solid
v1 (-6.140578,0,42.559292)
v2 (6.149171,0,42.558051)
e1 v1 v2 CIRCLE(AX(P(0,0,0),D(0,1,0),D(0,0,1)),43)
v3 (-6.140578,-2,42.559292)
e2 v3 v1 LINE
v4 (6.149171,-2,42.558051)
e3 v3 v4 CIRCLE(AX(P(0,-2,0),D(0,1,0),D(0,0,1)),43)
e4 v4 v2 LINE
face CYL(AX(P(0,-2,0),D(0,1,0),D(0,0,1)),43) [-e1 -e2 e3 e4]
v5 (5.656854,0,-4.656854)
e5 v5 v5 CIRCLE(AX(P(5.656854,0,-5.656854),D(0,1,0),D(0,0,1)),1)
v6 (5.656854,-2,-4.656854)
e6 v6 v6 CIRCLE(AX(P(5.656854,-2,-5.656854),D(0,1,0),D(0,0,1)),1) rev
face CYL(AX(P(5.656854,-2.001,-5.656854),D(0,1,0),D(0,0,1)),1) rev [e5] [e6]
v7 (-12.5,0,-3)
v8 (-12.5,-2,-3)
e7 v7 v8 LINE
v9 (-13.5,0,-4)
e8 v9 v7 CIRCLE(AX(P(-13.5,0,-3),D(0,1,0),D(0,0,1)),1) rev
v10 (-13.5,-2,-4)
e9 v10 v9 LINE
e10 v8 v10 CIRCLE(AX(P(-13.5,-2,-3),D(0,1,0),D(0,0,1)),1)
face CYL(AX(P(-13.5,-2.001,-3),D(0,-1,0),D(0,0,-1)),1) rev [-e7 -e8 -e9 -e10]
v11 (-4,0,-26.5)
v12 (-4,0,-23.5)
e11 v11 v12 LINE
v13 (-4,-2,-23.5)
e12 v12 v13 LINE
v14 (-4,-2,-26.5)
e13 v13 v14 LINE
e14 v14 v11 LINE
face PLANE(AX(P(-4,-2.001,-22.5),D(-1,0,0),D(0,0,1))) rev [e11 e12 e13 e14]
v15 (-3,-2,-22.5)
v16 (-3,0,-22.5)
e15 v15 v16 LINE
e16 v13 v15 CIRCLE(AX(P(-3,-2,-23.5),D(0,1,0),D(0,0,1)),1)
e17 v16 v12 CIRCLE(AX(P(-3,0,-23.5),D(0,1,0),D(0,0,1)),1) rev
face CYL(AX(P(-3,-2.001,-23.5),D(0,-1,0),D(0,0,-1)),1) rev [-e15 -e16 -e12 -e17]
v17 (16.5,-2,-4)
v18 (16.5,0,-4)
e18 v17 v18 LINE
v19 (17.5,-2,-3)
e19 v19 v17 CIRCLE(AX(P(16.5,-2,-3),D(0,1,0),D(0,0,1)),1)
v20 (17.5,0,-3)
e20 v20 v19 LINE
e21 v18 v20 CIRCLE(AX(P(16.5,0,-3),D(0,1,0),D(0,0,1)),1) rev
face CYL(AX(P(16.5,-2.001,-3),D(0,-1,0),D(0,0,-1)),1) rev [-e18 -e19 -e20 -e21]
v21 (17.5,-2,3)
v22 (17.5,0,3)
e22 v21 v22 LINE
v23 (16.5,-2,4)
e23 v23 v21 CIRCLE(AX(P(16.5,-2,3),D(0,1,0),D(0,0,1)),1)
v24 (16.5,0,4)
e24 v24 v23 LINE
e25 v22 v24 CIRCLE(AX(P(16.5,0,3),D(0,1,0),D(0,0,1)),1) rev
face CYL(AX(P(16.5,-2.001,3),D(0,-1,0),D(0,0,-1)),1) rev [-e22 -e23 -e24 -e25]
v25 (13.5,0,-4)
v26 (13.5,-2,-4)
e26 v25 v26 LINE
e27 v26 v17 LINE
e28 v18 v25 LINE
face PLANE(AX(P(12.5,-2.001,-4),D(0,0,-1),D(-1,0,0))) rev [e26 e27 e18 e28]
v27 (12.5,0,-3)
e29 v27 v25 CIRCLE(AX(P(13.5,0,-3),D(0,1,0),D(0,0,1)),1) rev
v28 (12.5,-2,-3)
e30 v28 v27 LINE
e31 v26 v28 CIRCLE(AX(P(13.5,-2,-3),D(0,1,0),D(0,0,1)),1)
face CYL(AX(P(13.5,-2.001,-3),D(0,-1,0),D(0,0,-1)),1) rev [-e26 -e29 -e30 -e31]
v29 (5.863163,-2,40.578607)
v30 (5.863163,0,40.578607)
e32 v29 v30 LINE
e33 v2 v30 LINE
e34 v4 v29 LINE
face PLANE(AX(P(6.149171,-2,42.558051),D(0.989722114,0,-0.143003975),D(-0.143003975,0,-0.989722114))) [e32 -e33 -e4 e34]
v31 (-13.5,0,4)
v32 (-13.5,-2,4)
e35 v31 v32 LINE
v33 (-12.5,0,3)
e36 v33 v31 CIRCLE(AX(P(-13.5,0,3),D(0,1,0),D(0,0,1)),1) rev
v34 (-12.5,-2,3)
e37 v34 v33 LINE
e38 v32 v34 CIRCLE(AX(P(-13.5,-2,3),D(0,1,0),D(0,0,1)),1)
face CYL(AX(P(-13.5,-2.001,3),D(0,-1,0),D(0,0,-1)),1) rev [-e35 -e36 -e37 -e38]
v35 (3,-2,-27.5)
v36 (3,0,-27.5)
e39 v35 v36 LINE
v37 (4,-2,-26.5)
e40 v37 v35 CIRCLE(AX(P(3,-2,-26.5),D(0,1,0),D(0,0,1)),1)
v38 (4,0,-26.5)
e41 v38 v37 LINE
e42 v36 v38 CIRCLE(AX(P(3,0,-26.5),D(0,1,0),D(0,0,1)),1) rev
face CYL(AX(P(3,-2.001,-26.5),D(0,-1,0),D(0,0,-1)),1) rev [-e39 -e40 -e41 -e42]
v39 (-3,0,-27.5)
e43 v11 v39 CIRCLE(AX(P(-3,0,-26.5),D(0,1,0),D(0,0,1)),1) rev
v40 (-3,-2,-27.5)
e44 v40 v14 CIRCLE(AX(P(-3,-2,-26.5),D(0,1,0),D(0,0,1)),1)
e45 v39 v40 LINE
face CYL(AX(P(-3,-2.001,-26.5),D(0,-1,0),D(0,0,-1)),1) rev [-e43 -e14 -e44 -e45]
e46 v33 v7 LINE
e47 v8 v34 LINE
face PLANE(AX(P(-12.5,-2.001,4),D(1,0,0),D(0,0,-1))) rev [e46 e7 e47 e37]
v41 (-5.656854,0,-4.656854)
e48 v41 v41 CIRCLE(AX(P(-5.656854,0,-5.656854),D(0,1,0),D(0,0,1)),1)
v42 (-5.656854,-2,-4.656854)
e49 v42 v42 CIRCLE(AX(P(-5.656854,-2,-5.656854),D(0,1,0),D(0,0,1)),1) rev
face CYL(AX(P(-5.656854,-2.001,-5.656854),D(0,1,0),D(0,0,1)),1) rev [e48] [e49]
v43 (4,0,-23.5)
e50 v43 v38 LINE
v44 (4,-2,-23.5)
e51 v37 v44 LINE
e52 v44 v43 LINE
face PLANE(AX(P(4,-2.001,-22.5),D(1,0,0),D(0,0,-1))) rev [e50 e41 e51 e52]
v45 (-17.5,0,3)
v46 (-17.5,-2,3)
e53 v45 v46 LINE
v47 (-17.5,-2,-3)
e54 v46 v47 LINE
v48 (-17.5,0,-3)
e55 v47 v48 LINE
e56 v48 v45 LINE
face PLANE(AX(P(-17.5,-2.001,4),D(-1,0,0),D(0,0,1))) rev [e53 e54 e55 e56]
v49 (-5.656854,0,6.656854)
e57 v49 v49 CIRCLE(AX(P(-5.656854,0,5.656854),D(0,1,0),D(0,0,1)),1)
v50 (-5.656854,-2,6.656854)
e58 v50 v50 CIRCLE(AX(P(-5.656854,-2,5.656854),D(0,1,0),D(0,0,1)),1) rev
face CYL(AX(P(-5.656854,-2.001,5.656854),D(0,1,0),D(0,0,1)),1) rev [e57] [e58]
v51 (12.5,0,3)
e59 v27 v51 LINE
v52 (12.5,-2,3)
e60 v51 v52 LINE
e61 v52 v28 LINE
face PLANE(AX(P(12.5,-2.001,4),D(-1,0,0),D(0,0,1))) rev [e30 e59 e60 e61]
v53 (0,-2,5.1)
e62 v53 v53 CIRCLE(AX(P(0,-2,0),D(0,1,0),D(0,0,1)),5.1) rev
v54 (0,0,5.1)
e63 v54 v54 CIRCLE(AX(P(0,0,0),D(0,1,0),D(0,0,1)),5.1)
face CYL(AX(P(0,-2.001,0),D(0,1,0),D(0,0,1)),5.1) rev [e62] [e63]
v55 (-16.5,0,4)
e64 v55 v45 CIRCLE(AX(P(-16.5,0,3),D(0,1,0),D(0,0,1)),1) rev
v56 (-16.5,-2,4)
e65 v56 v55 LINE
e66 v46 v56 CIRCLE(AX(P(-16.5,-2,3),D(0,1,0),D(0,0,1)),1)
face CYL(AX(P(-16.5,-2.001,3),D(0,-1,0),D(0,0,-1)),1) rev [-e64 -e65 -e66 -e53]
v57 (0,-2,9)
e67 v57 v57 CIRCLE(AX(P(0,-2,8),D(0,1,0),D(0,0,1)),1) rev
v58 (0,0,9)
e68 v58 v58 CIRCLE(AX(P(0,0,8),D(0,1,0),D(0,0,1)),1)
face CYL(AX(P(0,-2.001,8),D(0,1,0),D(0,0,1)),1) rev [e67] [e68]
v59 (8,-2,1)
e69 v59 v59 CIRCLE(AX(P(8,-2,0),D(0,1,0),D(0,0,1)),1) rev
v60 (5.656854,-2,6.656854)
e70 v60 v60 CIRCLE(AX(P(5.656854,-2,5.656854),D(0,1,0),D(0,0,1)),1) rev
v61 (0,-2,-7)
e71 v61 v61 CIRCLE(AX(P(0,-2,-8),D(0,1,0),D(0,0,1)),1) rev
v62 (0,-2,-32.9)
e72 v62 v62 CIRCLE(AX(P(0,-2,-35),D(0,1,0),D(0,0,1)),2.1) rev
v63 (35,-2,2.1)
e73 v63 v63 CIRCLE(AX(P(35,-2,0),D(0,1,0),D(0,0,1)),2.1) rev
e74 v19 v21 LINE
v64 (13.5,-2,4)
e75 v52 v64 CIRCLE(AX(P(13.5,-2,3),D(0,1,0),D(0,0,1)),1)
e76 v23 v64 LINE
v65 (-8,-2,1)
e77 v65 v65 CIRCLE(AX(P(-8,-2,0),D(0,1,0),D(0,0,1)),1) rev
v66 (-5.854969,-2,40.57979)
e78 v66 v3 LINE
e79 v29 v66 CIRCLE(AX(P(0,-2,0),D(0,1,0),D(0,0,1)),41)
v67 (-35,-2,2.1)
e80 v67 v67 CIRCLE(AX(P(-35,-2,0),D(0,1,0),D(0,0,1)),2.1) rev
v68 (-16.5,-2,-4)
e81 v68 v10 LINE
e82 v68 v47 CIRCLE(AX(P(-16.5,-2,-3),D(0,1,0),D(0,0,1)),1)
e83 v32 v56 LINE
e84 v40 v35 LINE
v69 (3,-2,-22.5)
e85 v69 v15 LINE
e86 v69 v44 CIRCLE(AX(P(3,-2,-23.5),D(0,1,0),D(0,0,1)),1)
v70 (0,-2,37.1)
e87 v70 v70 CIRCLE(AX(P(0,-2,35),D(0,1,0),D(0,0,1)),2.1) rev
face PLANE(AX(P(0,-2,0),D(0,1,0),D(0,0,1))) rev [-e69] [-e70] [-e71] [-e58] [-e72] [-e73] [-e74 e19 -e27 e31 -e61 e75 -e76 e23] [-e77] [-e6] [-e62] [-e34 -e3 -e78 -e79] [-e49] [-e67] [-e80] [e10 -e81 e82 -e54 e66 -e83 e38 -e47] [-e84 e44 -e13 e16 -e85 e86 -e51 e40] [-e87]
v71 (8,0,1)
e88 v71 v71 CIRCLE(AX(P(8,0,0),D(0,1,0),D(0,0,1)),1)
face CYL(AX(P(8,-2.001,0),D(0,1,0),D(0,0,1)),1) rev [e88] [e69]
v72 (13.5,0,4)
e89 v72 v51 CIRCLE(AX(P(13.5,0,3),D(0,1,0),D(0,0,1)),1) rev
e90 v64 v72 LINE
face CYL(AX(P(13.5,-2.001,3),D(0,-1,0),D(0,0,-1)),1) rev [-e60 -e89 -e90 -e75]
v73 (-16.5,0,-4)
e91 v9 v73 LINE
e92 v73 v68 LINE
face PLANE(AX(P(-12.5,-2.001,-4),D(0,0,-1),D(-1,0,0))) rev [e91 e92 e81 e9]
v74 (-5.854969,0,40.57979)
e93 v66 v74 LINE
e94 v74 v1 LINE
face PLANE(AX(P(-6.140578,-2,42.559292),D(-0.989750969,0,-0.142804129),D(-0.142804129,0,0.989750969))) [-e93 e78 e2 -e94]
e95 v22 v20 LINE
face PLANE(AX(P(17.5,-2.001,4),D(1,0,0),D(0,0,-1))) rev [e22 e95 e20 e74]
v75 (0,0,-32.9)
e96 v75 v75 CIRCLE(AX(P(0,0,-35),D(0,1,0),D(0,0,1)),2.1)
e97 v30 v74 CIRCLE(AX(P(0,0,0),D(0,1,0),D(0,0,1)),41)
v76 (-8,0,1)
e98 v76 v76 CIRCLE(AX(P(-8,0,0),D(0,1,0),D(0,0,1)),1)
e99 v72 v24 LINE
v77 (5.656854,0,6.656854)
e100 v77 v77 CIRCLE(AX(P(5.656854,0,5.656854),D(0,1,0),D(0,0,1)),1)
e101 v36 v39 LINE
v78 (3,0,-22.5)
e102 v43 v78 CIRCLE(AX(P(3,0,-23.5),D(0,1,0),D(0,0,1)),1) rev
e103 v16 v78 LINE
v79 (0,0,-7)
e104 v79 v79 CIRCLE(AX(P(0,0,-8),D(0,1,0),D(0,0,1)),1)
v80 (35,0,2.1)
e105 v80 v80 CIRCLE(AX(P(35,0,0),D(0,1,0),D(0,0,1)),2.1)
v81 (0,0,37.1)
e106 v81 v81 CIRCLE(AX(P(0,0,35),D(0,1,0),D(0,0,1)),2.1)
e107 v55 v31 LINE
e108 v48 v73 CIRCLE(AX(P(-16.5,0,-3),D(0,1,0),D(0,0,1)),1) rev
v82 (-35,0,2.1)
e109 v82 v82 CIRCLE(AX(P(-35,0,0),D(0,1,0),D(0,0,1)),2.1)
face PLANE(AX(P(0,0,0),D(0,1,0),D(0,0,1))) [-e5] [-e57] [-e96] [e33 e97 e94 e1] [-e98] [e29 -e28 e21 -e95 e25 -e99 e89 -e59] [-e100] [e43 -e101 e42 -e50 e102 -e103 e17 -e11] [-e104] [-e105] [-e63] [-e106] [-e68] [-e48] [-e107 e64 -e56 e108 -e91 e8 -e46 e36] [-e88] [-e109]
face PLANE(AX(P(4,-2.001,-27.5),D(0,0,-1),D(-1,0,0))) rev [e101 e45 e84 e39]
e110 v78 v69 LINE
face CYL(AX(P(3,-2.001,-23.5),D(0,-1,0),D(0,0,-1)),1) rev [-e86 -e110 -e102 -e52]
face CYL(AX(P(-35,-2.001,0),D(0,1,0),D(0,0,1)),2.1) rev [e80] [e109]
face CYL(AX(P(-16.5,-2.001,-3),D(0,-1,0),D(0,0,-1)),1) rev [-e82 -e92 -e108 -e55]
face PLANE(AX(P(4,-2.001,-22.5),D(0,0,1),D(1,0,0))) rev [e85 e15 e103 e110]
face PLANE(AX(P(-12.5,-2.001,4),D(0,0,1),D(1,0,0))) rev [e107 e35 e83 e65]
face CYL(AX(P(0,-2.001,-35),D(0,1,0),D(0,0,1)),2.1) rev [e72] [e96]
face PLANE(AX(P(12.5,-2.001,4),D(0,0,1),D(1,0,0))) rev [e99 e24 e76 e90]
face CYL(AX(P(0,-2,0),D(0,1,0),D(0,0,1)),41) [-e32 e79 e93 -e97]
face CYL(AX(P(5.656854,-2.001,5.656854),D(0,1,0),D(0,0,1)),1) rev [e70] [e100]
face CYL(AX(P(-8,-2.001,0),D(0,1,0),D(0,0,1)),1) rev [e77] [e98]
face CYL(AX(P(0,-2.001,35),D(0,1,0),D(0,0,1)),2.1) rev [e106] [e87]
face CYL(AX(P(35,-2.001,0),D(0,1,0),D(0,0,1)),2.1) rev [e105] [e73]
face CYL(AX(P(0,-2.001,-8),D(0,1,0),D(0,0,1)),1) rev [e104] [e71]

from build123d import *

# Parameters (mm, degrees)
SM_BASE_FLANGE_1_DEPTH = 2
CUT_EXTRUDE_1_REACH    = 61.447
SKETCH_6_R             = 2.1
SKETCH_6_R_2           = 5.1
SKETCH_6_R_3           = 1
SKETCH_6_W             = 8
SKETCH_6_H             = 5
SKETCH_6_W_2           = 5
SKETCH_6_H_2           = 8
FILLET_1_R             = 1


# Sheet-metal steps are written as plain solids
with BuildPart() as part:
    # Sketch 1 → 基体-法兰1 (new body)
    with BuildSketch(Plane(origin=(0, 0, 0), x_dir=(1, 0, 0), z_dir=(0, 1, 0))):
        with BuildLine():
            Line((-6.14057756, -42.559291667), (-5.854969301, -40.579789729))
            ThreePointArc((-5.854969301, -40.579789729), (-0.00413932, 40.999999791), (5.863162974, -40.578606678))
            Line((5.863162974, -40.578606678), (6.149170924, -42.558050906))
            ThreePointArc((6.149170924, -42.558050906), (0.004341238, -42.999999781), (-6.14057756, -42.559291667))
        make_face()
    extrude(amount=-SM_BASE_FLANGE_1_DEPTH)

    # 草图6 → 切除-拉伸1 (cut, up to next)
    with BuildSketch(Plane(origin=(0, 0, 0), x_dir=(1, 0, 0), z_dir=(0, 1, 0)), mode=Mode.PRIVATE) as cut_extrude_1_sk1:
        with Locations(Location((0, 35, 0), (0, 0, 270))):
            Circle(SKETCH_6_R)
    cut_extrude_1_tool1 = extrude(cut_extrude_1_sk1.sketch, amount=-CUT_EXTRUDE_1_REACH, mode=Mode.PRIVATE) & part.part
    # 草图6 → 切除-拉伸1 (cut, up to next)
    with BuildSketch(Plane(origin=(0, 0, 0), x_dir=(1, 0, 0), z_dir=(0, 1, 0)), mode=Mode.PRIVATE) as cut_extrude_1_sk2:
        with Locations(Location((35, 0, 0), (0, 0, 270))):
            Circle(SKETCH_6_R)
    cut_extrude_1_tool2 = extrude(cut_extrude_1_sk2.sketch, amount=-CUT_EXTRUDE_1_REACH, mode=Mode.PRIVATE) & part.part
    # 草图6 → 切除-拉伸1 (cut, up to next)
    with BuildSketch(Plane(origin=(0, 0, 0), x_dir=(1, 0, 0), z_dir=(0, 1, 0)), mode=Mode.PRIVATE) as cut_extrude_1_sk3:
        with Locations(Location((0, -35, 0), (0, 0, 270))):
            Circle(SKETCH_6_R)
    cut_extrude_1_tool3 = extrude(cut_extrude_1_sk3.sketch, amount=-CUT_EXTRUDE_1_REACH, mode=Mode.PRIVATE) & part.part
    # 草图6 → 切除-拉伸1 (cut, up to next)
    with BuildSketch(Plane(origin=(0, 0, 0), x_dir=(1, 0, 0), z_dir=(0, 1, 0)), mode=Mode.PRIVATE) as cut_extrude_1_sk4:
        with Locations(Location((-35, 0, 0), (0, 0, 270))):
            Circle(SKETCH_6_R)
    cut_extrude_1_tool4 = extrude(cut_extrude_1_sk4.sketch, amount=-CUT_EXTRUDE_1_REACH, mode=Mode.PRIVATE) & part.part
    # 草图6 → 切除-拉伸1 (cut, up to next)
    with BuildSketch(Plane(origin=(0, 0, 0), x_dir=(1, 0, 0), z_dir=(0, 1, 0)), mode=Mode.PRIVATE) as cut_extrude_1_sk5:
        with Locations(Location((0, 0, 0), (0, 0, 270))):
            Circle(SKETCH_6_R_2)
    cut_extrude_1_tool5 = extrude(cut_extrude_1_sk5.sketch, amount=-CUT_EXTRUDE_1_REACH, mode=Mode.PRIVATE) & part.part
    # 草图6 → 切除-拉伸1 (cut, up to next)
    with BuildSketch(Plane(origin=(0, 0, 0), x_dir=(1, 0, 0), z_dir=(0, 1, 0)), mode=Mode.PRIVATE) as cut_extrude_1_sk6:
        with Locations(Location((0, 8, 0), (0, 0, 270))):
            Circle(SKETCH_6_R_3)
    cut_extrude_1_tool6 = extrude(cut_extrude_1_sk6.sketch, amount=-CUT_EXTRUDE_1_REACH, mode=Mode.PRIVATE) & part.part
    # 草图6 → 切除-拉伸1 (cut, up to next)
    with BuildSketch(Plane(origin=(0, 0, 0), x_dir=(1, 0, 0), z_dir=(0, 1, 0)), mode=Mode.PRIVATE) as cut_extrude_1_sk7:
        with Locations(Location((5.656854249, 5.656854249, 0), (0, 0, 270))):
            Circle(SKETCH_6_R_3)
    cut_extrude_1_tool7 = extrude(cut_extrude_1_sk7.sketch, amount=-CUT_EXTRUDE_1_REACH, mode=Mode.PRIVATE) & part.part
    # 草图6 → 切除-拉伸1 (cut, up to next)
    with BuildSketch(Plane(origin=(0, 0, 0), x_dir=(1, 0, 0), z_dir=(0, 1, 0)), mode=Mode.PRIVATE) as cut_extrude_1_sk8:
        with Locations(Location((8, 0, 0), (0, 0, 270))):
            Circle(SKETCH_6_R_3)
    cut_extrude_1_tool8 = extrude(cut_extrude_1_sk8.sketch, amount=-CUT_EXTRUDE_1_REACH, mode=Mode.PRIVATE) & part.part
    # 草图6 → 切除-拉伸1 (cut, up to next)
    with BuildSketch(Plane(origin=(0, 0, 0), x_dir=(1, 0, 0), z_dir=(0, 1, 0)), mode=Mode.PRIVATE) as cut_extrude_1_sk9:
        with Locations(Location((5.656854249, -5.656854249, 0), (0, 0, 270))):
            Circle(SKETCH_6_R_3)
    cut_extrude_1_tool9 = extrude(cut_extrude_1_sk9.sketch, amount=-CUT_EXTRUDE_1_REACH, mode=Mode.PRIVATE) & part.part
    # 草图6 → 切除-拉伸1 (cut, up to next)
    with BuildSketch(Plane(origin=(0, 0, 0), x_dir=(1, 0, 0), z_dir=(0, 1, 0)), mode=Mode.PRIVATE) as cut_extrude_1_sk10:
        with Locations(Location((0, -8, 0), (0, 0, 270))):
            Circle(SKETCH_6_R_3)
    cut_extrude_1_tool10 = extrude(cut_extrude_1_sk10.sketch, amount=-CUT_EXTRUDE_1_REACH, mode=Mode.PRIVATE) & part.part
    # 草图6 → 切除-拉伸1 (cut, up to next)
    with BuildSketch(Plane(origin=(0, 0, 0), x_dir=(1, 0, 0), z_dir=(0, 1, 0)), mode=Mode.PRIVATE) as cut_extrude_1_sk11:
        with Locations(Location((-5.656854249, -5.656854249, 0), (0, 0, 270))):
            Circle(SKETCH_6_R_3)
    cut_extrude_1_tool11 = extrude(cut_extrude_1_sk11.sketch, amount=-CUT_EXTRUDE_1_REACH, mode=Mode.PRIVATE) & part.part
    # 草图6 → 切除-拉伸1 (cut, up to next)
    with BuildSketch(Plane(origin=(0, 0, 0), x_dir=(1, 0, 0), z_dir=(0, 1, 0)), mode=Mode.PRIVATE) as cut_extrude_1_sk12:
        with Locations(Location((-8, 0, 0), (0, 0, 270))):
            Circle(SKETCH_6_R_3)
    cut_extrude_1_tool12 = extrude(cut_extrude_1_sk12.sketch, amount=-CUT_EXTRUDE_1_REACH, mode=Mode.PRIVATE) & part.part
    # 草图6 → 切除-拉伸1 (cut, up to next)
    with BuildSketch(Plane(origin=(0, 0, 0), x_dir=(1, 0, 0), z_dir=(0, 1, 0)), mode=Mode.PRIVATE) as cut_extrude_1_sk13:
        with Locations(Location((-5.656854249, 5.656854249, 0), (0, 0, 270))):
            Circle(SKETCH_6_R_3)
    cut_extrude_1_tool13 = extrude(cut_extrude_1_sk13.sketch, amount=-CUT_EXTRUDE_1_REACH, mode=Mode.PRIVATE) & part.part
    # 草图6 → 切除-拉伸1 (cut, up to next)
    with BuildSketch(Plane(origin=(0, 0, 0), x_dir=(1, 0, 0), z_dir=(0, 1, 0)), mode=Mode.PRIVATE) as cut_extrude_1_sk14:
        with Locations((0, 25)):
            Rectangle(SKETCH_6_W, SKETCH_6_H)
    cut_extrude_1_tool14 = extrude(cut_extrude_1_sk14.sketch, amount=-CUT_EXTRUDE_1_REACH, mode=Mode.PRIVATE) & part.part
    # 草图6 → 切除-拉伸1 (cut, up to next)
    with BuildSketch(Plane(origin=(0, 0, 0), x_dir=(1, 0, 0), z_dir=(0, 1, 0)), mode=Mode.PRIVATE) as cut_extrude_1_sk15:
        with Locations((15, 0)):
            Rectangle(SKETCH_6_W_2, SKETCH_6_H_2)
    cut_extrude_1_tool15 = extrude(cut_extrude_1_sk15.sketch, amount=-CUT_EXTRUDE_1_REACH, mode=Mode.PRIVATE) & part.part
    # 草图6 → 切除-拉伸1 (cut, up to next)
    with BuildSketch(Plane(origin=(0, 0, 0), x_dir=(1, 0, 0), z_dir=(0, 1, 0)), mode=Mode.PRIVATE) as cut_extrude_1_sk16:
        with Locations((-15, 0)):
            Rectangle(SKETCH_6_W_2, SKETCH_6_H_2)
    cut_extrude_1_tool16 = extrude(cut_extrude_1_sk16.sketch, amount=-CUT_EXTRUDE_1_REACH, mode=Mode.PRIVATE) & part.part
    add(cut_extrude_1_tool1.solids().sort_by_distance((0, 0, -35))[0], mode=Mode.SUBTRACT)
    add(cut_extrude_1_tool2.solids().sort_by_distance((35, 0, 0))[0], mode=Mode.SUBTRACT)
    add(cut_extrude_1_tool3.solids().sort_by_distance((0, 0, 35))[0], mode=Mode.SUBTRACT)
    add(cut_extrude_1_tool4.solids().sort_by_distance((-35, 0, 0))[0], mode=Mode.SUBTRACT)
    add(cut_extrude_1_tool5.solids().sort_by_distance((0, 0, 0))[0], mode=Mode.SUBTRACT)
    add(cut_extrude_1_tool6.solids().sort_by_distance((0, 0, -8))[0], mode=Mode.SUBTRACT)
    add(cut_extrude_1_tool7.solids().sort_by_distance((5.656854, 0, -5.656854))[0], mode=Mode.SUBTRACT)
    add(cut_extrude_1_tool8.solids().sort_by_distance((8, 0, 0))[0], mode=Mode.SUBTRACT)
    add(cut_extrude_1_tool9.solids().sort_by_distance((5.656854, 0, 5.656854))[0], mode=Mode.SUBTRACT)
    add(cut_extrude_1_tool10.solids().sort_by_distance((0, 0, 8))[0], mode=Mode.SUBTRACT)
    add(cut_extrude_1_tool11.solids().sort_by_distance((-5.656854, 0, 5.656854))[0], mode=Mode.SUBTRACT)
    add(cut_extrude_1_tool12.solids().sort_by_distance((-8, 0, 0))[0], mode=Mode.SUBTRACT)
    add(cut_extrude_1_tool13.solids().sort_by_distance((-5.656854, 0, -5.656854))[0], mode=Mode.SUBTRACT)
    add(cut_extrude_1_tool14.solids().sort_by_distance((0, 0, -25))[0], mode=Mode.SUBTRACT)
    add(cut_extrude_1_tool15.solids().sort_by_distance((15, 0, 0))[0], mode=Mode.SUBTRACT)
    add(cut_extrude_1_tool16.solids().sort_by_distance((-15, 0, 0))[0], mode=Mode.SUBTRACT)

    # 圆角1
    fillet_1_edges = [part.edges().sort_by_distance(p)[0] for p in [
        (-17.5, -1, 4),
        (-17.5, -1, -4),
        (-12.5, -1, -4),
        (-12.5, -1, 4),
        (12.5, -1, 4),
        (12.5, -1, -4),
        (17.5, -1, -4),
        (17.5, -1, 4),
        (-4, -1, -22.5),
        (-4, -1, -27.5),
        (4, -1, -27.5),
        (4, -1, -22.5),
    ]]
    fillet(fillet_1_edges, radius=FILLET_1_R)


solid = part.part
